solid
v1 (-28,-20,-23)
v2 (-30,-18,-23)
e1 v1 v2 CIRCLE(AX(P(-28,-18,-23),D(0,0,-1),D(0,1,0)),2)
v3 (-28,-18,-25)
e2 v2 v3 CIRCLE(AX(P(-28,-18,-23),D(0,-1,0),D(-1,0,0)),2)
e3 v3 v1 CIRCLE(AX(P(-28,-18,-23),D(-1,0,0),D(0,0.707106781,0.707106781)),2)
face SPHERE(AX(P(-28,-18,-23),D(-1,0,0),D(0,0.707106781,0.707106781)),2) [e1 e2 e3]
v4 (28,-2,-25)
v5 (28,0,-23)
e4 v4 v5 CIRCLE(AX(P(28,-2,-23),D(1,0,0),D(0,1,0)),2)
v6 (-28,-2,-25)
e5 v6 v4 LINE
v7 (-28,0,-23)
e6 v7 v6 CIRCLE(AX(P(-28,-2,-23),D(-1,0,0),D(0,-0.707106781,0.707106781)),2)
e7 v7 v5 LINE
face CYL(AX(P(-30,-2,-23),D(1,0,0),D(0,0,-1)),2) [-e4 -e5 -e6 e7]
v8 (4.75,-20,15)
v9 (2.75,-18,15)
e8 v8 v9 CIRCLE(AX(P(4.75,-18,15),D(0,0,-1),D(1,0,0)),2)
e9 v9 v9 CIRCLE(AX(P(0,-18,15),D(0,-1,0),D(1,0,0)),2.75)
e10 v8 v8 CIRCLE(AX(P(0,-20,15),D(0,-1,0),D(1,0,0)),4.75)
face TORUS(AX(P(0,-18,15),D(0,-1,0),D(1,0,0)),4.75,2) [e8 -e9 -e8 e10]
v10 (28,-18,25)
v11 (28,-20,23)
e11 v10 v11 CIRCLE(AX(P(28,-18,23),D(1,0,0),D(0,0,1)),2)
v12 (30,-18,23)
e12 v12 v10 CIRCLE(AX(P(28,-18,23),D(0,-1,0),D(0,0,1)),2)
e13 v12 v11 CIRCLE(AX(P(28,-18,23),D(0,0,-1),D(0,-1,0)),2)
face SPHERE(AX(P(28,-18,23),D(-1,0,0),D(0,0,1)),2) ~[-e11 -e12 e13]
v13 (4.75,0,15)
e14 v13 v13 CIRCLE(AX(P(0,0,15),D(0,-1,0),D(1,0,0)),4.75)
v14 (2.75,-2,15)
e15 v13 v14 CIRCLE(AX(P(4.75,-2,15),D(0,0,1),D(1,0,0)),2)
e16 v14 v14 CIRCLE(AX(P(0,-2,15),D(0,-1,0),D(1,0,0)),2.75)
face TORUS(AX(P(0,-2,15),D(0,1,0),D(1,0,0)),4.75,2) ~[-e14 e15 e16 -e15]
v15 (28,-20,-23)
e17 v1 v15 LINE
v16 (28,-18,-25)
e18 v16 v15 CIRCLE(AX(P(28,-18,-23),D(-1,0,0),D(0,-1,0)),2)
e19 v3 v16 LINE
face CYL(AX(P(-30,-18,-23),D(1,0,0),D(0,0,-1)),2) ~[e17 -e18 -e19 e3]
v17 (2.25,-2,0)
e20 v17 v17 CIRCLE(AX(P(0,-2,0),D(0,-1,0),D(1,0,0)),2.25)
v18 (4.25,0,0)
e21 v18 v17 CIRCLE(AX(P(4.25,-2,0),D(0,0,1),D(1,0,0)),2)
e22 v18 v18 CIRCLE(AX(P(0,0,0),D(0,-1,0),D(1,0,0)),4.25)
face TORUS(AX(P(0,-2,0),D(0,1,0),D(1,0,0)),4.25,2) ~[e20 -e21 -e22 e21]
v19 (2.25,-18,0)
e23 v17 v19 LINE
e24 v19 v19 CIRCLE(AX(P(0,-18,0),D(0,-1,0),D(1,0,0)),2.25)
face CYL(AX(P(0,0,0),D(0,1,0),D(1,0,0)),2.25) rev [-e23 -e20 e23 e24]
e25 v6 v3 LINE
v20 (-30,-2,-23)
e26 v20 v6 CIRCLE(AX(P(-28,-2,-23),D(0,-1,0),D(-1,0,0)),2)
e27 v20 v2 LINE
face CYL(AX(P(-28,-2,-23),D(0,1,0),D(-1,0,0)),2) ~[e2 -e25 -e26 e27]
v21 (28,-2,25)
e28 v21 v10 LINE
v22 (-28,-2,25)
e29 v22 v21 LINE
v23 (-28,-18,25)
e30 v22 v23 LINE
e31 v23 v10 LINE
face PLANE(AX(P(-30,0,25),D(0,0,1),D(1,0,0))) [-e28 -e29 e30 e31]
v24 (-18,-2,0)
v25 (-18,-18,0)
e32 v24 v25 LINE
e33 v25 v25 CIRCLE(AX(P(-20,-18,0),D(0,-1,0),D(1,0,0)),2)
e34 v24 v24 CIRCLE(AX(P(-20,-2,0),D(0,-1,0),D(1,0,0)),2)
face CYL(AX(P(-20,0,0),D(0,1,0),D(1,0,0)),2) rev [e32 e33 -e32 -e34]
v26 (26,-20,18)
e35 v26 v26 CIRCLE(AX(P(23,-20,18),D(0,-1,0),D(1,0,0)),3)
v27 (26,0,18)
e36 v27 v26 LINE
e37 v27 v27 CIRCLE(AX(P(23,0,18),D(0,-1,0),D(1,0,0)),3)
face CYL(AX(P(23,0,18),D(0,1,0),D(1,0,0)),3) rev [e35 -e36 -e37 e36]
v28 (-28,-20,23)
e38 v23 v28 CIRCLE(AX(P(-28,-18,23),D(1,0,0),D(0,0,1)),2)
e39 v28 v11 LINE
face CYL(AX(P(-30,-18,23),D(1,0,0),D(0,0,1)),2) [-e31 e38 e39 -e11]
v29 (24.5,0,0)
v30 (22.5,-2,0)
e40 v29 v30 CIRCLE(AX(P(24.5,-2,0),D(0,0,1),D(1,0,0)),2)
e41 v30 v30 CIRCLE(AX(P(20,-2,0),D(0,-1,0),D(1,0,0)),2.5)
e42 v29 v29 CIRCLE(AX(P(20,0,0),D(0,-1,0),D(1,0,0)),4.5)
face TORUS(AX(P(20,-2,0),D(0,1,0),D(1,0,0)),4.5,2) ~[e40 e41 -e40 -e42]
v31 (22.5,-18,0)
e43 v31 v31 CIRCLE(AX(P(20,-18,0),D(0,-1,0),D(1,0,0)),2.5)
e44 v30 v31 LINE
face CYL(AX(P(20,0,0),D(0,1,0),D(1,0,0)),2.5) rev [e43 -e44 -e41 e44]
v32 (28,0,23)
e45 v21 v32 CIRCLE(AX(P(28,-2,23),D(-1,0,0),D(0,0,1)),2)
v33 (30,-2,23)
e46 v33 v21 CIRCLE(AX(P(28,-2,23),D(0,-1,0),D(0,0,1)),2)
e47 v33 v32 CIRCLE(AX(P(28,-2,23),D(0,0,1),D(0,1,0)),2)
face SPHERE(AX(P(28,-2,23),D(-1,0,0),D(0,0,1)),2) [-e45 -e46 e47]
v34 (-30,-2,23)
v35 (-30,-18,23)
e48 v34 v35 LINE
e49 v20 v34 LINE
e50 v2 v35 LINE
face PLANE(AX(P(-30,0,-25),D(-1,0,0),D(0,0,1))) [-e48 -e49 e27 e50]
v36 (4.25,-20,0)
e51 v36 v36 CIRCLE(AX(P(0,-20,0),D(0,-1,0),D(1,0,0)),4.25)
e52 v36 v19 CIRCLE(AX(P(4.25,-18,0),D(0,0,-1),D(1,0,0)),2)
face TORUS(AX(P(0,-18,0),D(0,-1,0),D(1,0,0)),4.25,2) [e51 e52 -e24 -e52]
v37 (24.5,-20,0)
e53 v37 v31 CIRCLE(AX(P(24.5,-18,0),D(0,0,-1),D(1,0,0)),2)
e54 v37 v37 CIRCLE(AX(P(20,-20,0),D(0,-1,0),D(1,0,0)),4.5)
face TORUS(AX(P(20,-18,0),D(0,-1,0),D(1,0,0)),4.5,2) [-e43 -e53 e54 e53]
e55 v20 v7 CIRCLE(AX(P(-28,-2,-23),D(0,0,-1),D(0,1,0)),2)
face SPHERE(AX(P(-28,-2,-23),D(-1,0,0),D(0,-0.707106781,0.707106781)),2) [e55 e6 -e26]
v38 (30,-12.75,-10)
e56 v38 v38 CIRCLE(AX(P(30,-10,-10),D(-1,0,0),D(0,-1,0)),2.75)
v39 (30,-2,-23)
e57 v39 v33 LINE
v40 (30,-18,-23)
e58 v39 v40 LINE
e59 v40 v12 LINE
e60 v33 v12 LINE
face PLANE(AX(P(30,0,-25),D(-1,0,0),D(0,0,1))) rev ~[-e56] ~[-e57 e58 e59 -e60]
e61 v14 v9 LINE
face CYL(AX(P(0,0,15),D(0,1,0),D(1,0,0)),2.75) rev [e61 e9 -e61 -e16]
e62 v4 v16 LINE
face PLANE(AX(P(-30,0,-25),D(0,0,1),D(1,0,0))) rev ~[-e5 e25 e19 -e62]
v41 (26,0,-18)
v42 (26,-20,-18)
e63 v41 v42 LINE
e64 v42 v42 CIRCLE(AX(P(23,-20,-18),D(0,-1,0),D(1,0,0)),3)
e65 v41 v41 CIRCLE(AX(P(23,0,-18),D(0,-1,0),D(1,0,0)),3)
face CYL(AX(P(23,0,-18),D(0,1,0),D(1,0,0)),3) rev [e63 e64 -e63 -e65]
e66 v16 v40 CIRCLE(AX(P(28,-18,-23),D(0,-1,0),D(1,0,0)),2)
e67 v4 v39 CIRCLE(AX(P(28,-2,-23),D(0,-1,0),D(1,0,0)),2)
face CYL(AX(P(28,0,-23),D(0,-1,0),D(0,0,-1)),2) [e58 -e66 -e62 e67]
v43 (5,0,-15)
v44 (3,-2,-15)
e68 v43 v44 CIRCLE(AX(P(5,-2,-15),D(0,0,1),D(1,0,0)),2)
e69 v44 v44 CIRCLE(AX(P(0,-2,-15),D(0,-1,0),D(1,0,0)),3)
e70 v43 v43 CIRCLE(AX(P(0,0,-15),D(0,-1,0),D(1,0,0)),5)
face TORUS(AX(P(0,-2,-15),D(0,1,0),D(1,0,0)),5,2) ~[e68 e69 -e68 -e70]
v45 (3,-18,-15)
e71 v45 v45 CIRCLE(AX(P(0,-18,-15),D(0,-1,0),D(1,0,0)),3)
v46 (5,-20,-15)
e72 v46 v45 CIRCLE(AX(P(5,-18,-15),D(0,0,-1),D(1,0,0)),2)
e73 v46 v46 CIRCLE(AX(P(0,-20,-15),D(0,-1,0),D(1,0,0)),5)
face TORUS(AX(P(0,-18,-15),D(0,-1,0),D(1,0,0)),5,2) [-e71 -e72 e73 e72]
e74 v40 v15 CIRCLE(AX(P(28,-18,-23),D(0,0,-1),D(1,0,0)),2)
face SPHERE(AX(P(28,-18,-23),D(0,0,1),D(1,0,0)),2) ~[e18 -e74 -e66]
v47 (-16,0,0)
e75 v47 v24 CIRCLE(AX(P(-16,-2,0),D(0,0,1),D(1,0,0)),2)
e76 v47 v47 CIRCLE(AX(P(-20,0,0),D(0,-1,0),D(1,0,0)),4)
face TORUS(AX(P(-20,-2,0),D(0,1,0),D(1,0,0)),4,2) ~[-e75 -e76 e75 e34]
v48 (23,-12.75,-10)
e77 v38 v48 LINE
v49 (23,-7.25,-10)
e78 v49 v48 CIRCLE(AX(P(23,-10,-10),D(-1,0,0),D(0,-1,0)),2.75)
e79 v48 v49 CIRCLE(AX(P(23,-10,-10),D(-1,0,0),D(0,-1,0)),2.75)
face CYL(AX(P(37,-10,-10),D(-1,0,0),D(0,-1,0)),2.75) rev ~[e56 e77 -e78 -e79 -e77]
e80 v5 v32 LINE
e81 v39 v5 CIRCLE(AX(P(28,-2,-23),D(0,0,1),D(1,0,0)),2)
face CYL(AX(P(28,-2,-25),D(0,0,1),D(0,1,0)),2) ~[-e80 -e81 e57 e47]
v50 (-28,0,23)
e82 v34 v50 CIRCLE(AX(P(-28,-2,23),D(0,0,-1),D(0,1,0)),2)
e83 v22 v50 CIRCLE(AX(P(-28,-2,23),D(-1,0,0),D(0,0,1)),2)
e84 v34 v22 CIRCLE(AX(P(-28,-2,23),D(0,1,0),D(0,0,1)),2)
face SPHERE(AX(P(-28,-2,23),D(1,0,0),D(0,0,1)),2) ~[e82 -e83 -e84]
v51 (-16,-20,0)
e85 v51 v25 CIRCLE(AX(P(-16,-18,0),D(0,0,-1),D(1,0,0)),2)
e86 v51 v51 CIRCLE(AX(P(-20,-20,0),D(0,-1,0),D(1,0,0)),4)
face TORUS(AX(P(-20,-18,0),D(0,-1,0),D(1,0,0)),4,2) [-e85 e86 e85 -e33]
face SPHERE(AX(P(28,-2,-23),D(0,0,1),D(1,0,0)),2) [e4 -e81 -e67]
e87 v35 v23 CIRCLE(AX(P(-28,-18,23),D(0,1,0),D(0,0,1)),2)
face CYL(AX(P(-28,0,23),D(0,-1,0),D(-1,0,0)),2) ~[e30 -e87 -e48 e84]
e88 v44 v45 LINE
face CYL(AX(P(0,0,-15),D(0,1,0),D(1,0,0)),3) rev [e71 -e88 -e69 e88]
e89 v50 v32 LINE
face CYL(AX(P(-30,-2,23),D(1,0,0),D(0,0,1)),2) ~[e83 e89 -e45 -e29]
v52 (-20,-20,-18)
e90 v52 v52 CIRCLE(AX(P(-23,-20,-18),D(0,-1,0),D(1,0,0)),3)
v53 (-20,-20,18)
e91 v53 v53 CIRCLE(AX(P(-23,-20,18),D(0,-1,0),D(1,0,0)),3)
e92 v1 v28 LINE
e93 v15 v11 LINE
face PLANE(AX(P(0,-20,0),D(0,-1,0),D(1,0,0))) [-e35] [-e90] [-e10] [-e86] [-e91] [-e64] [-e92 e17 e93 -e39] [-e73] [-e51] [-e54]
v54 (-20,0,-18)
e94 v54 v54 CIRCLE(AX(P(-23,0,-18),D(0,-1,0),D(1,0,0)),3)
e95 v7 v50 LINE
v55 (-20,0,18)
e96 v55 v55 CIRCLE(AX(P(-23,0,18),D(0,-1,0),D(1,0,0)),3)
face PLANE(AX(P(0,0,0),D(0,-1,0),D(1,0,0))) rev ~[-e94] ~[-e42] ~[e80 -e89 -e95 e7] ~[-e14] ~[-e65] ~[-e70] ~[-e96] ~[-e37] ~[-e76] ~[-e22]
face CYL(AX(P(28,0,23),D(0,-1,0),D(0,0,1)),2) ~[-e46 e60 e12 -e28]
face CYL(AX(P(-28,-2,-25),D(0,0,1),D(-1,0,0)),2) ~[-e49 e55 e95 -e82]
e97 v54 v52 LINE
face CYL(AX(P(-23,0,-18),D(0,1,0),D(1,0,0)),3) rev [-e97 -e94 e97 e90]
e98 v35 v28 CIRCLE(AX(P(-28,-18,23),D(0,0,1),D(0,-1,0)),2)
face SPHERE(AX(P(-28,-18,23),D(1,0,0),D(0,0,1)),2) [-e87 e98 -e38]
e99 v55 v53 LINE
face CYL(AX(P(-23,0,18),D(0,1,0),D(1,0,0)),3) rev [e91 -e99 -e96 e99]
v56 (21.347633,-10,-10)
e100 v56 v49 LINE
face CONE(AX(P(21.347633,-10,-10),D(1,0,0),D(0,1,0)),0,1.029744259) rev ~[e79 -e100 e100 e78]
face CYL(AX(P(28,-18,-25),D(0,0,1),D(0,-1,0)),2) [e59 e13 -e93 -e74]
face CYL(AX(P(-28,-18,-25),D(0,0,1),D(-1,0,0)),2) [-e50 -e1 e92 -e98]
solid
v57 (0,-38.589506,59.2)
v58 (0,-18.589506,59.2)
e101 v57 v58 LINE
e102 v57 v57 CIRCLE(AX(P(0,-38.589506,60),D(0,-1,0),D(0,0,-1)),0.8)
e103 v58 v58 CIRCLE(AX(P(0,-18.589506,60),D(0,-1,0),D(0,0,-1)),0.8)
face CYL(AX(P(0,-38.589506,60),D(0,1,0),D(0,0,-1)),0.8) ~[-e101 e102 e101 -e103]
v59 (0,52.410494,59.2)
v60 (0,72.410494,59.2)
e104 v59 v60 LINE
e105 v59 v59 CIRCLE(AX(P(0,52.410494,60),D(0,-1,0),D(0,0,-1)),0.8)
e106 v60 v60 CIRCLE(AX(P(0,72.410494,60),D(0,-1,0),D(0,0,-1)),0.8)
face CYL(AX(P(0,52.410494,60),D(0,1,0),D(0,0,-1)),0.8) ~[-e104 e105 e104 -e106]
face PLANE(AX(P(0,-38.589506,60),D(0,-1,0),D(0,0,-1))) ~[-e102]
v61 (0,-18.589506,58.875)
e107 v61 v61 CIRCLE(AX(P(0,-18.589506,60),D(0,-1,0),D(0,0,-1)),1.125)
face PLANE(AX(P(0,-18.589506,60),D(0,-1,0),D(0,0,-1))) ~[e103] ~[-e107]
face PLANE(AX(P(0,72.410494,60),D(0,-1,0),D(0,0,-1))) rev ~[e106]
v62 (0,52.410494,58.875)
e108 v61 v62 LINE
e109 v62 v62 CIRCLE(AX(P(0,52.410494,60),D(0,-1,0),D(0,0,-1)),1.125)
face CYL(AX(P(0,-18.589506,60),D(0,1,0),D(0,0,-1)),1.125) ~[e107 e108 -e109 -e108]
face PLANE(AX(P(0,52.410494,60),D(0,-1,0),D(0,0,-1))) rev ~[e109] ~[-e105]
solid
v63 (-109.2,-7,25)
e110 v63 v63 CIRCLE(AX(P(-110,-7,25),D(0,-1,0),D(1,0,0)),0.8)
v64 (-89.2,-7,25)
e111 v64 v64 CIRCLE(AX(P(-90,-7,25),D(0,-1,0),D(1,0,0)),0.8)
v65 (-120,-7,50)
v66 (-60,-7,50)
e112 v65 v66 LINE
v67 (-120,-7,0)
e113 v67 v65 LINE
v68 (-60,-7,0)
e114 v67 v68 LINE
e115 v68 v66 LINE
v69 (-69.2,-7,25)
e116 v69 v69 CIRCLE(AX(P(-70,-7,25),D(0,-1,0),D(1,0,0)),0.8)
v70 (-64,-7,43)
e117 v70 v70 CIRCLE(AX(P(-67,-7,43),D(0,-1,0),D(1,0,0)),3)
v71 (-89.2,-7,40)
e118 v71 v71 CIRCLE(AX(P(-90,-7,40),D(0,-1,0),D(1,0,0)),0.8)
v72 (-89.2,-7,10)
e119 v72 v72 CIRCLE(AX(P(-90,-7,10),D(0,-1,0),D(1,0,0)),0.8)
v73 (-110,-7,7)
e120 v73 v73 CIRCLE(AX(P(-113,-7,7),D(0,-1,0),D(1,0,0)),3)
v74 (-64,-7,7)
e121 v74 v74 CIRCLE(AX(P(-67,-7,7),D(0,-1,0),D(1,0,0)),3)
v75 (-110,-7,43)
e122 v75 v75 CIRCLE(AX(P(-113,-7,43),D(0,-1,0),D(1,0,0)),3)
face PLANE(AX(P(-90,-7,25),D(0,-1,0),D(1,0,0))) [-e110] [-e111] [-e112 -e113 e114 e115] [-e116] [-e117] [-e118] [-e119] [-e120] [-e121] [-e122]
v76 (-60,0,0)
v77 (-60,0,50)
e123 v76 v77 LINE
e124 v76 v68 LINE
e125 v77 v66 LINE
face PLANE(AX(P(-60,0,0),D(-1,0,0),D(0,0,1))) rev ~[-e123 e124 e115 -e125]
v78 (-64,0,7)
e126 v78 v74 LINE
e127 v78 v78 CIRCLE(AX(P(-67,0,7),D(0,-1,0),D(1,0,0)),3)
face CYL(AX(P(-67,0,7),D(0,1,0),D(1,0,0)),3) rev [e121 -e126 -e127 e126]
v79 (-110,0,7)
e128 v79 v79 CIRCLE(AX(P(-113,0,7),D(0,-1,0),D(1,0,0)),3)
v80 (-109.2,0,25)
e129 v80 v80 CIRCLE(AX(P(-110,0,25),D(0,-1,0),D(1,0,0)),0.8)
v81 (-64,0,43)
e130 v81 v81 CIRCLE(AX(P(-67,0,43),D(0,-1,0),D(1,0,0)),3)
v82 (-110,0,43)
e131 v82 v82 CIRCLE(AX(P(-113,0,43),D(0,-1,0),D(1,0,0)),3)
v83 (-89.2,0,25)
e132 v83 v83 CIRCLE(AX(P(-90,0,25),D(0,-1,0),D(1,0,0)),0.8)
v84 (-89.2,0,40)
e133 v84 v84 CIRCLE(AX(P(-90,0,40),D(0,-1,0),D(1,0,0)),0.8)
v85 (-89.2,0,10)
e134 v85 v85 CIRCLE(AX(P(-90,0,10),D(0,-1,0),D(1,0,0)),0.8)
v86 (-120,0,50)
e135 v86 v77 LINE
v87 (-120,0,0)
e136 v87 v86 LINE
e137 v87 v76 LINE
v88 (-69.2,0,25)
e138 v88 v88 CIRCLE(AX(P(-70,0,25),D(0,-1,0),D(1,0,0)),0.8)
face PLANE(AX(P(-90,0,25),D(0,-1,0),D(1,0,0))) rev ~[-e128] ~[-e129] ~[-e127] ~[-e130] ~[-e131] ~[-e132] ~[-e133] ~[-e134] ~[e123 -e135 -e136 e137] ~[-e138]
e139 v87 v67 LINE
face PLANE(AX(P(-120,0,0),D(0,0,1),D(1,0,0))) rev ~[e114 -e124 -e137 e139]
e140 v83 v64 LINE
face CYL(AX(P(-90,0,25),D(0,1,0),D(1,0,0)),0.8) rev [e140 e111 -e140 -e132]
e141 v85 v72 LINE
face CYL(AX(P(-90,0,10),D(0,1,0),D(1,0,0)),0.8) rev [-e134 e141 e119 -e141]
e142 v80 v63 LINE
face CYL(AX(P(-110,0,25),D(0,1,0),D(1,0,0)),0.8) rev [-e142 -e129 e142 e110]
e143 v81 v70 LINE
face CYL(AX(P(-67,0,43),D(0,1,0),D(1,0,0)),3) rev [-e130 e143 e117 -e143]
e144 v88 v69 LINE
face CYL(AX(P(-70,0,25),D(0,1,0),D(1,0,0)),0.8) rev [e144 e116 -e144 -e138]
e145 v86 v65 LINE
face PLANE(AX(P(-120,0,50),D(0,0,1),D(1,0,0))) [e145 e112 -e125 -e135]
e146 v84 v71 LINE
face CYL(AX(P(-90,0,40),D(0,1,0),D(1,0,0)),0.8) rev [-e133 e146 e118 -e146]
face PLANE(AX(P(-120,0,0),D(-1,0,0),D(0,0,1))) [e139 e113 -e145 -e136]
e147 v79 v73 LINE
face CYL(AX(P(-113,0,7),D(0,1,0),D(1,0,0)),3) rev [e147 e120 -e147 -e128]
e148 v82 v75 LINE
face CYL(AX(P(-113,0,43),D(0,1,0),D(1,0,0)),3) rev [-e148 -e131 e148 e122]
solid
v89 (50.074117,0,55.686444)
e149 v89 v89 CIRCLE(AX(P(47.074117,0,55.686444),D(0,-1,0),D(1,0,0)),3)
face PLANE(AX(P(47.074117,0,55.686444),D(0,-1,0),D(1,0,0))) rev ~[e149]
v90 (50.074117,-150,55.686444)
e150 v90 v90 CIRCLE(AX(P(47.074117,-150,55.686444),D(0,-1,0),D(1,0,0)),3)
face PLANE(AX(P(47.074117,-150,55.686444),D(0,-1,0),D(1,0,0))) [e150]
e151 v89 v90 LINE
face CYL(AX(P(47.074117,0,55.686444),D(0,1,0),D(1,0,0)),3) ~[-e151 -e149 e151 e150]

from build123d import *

# Parameters (mm, degrees)
F0_W         = 60
F0_H         = 50
F0_R         = 3
F0_R_2       = 2
F0_R_3       = 2.25
F0_R_4       = 2.5
F0_R_5       = 2.75
F1_DEPTH     = 20
F3_D         = 5.5
F3_DEPTH     = 7
F3_TIP       = 1.6523667023
F4_R         = 2
F5_R         = 2
F6_R         = 2
F7_T1_DEPTH  = 16
F7_S5_W      = 2
F7_S5_H      = 2
F7_T6_DEPTH  = 2
F7_S11_W     = 2
F7_S11_H     = 2
F7_T12_DEPTH = 2
F10_W        = 60
F10_H        = 50
F10_R        = 3
F10_R_2      = 0.8
F11_DEPTH    = 7
F12_R        = 3
F13_DEPTH    = 150


# Not quite as in the source:
# - a fillet or chamfer that OpenCascade refuses, or shapes differently, is made with other operations: its cross-section is extruded or revolved along the edge and cut away or added


with BuildPart() as f1:
    # F0 (on Front) → F1 (new body)
    with BuildSketch(Plane.XZ):
        Rectangle(F0_W, F0_H)
        with Locations((-23, -18)):
            Circle(F0_R, mode=Mode.SUBTRACT)
        with Locations((0, -15)):
            Circle(F0_R, mode=Mode.SUBTRACT)
        with Locations((23, -18)):
            Circle(F0_R, mode=Mode.SUBTRACT)
        with Locations((-20, 0)):
            Circle(F0_R_2, mode=Mode.SUBTRACT)
        with Locations((-23, 18)):
            Circle(F0_R, mode=Mode.SUBTRACT)
        Circle(F0_R_3, mode=Mode.SUBTRACT)
        with Locations((20, 0)):
            Circle(F0_R_4, mode=Mode.SUBTRACT)
        with Locations((0, 15)):
            Circle(F0_R_5, mode=Mode.SUBTRACT)
        with Locations((23, 18)):
            Circle(F0_R, mode=Mode.SUBTRACT)
    extrude(amount=F1_DEPTH)

    # F3
    with Locations(Plane.YZ.offset(30)):
        with Locations((-10, -10)):
            Hole(F3_D / 2, depth=F3_DEPTH)
            with Locations((0, 0, -(F3_DEPTH + F3_TIP / 2))):  # 118° drill point
                Cone(0, F3_D / 2, F3_TIP, mode=Mode.SUBTRACT)

    # F4
    f4_edges = [f1.edges().sort_by_distance(p)[0] for p in [
        (0, -20, 25),
        (0, 0, 25),
        (-30, -10, 25),
        (-30, -20, 0),
        (-30, 0, 0),
        (30, -10, 25),
        (30, 0, 0),
        (30, -20, 0),
        (30, -10, -25),
        (0, -20, -25),
        (0, 0, -25),
    ]]
    fillet(f4_edges, radius=F4_R)

    # F5
    f5_edges = [f1.edges().sort_by_distance(p)[0] for p in [
        (-3, -20, -15),
        (-22, -20, 0),
        (-2.75, -20, 15),
        (-2.25, -20, 0),
        (17.5, -20, 0),
        (-3, 0, -15),
        (17.5, 0, 0),
        (-22, 0, 0),
        (-2.75, 0, 15),
    ]]
    fillet(f5_edges, radius=F5_R)

    # F6
    f6_edges = [f1.edges().sort_by_distance(p)[0] for p in [
        (-2.25, 0, 0),
    ]]
    fillet(f6_edges, radius=F6_R)

    # F7: fillet of radius 2 on 1 edges, made by hand

    # F7_s2 → F7_t1 (cut)
    with BuildSketch(Plane.XZ.offset(2)):
        with BuildLine():
            ThreePointArc((-30, -23), (-29.4142135624, -24.4142135624), (-28, -25))
            Line((-28, -25), (-30, -25))
            Line((-30, -25), (-30, -23))
        make_face()
    extrude(amount=F7_T1_DEPTH, mode=Mode.SUBTRACT)


with BuildPart() as f7_tool4:
    # F7_s5 → F7_t6 (new body)
    with BuildSketch(Plane.YZ.offset(-28)):
        with Locations((-1, -24)):
            Rectangle(F7_S5_W, F7_S5_H)
    extrude(amount=-F7_T6_DEPTH)

    # F7_s7 → F7_t8 (revolve, cut)
    with BuildSketch(Plane(origin=(-28, -2, -23), x_dir=(0, -0.7071067812, 0.7071067812), z_dir=(0, -0.7071067812, -0.7071067812))):
        with BuildLine():
            ThreePointArc((0, -2), (2, 0), (0, 2))
            Line((0, 2), (0, -2))
        make_face()
    revolve(axis=Axis((-28, -2, -23), (-1, 0, 0)), mode=Mode.SUBTRACT)


with BuildPart() as f1_1:
    add(f1.part)

    # F7_t3: cut F7_tool4
    add(f7_tool4.part, mode=Mode.SUBTRACT)


with BuildPart() as f7_tool10:
    # F7_s11 → F7_t12 (new body)
    with BuildSketch(Plane.YZ.offset(-28)):
        with Locations((-19, -24)):
            Rectangle(F7_S11_W, F7_S11_H)
    extrude(amount=-F7_T12_DEPTH)

    # F7_s13 → F7_t14 (revolve, cut)
    with BuildSketch(Plane(origin=(-28, -18, -23), x_dir=(0, 0.7071067812, 0.7071067812), z_dir=(0, -0.7071067812, 0.7071067812))):
        with BuildLine():
            ThreePointArc((0, -2), (2, 0), (0, 2))
            Line((0, 2), (0, -2))
        make_face()
    revolve(axis=Axis((-28, -18, -23), (-1, 0, 0)), mode=Mode.SUBTRACT)


with BuildPart() as f1_2:
    add(f1_1.part)

    # F7_t9: cut F7_tool10
    add(f7_tool10.part, mode=Mode.SUBTRACT)


with BuildPart() as f9:
    # F8 (on Right) → F9 (revolve)
    with BuildSketch(Plane.YZ):
        Polygon((72.4104943052, 59.2), (72.4104943052, 60), (-38.5895056948, 60), (-38.5895056948, 59.2), (-18.5895056948, 59.2), (-18.5895056948, 58.875), (52.4104943052, 58.875), (52.4104943052, 59.2), align=None)
    revolve(axis=Axis((0, 16.9104943052, 60), (0, -1, 0)))


with BuildPart() as f11:
    # F10 (on Front) → F11 (new body)
    with BuildSketch(Plane.XZ):
        with Locations((-90, 25)):
            Rectangle(F10_W, F10_H)
        with Locations((-113, 7)):
            Circle(F10_R, mode=Mode.SUBTRACT)
        with Locations((-90, 10)):
            Circle(F10_R_2, mode=Mode.SUBTRACT)
        with Locations((-67, 7)):
            Circle(F10_R, mode=Mode.SUBTRACT)
        with Locations((-110, 25)):
            Circle(F10_R_2, mode=Mode.SUBTRACT)
        with Locations((-113, 43)):
            Circle(F10_R, mode=Mode.SUBTRACT)
        with Locations((-90, 25)):
            Circle(F10_R_2, mode=Mode.SUBTRACT)
        with Locations((-70, 25)):
            Circle(F10_R_2, mode=Mode.SUBTRACT)
        with Locations((-90, 40)):
            Circle(F10_R_2, mode=Mode.SUBTRACT)
        with Locations((-67, 43)):
            Circle(F10_R, mode=Mode.SUBTRACT)
    extrude(amount=F11_DEPTH)


with BuildPart() as f13:
    # F12 (on Front) → F13 (new body)
    with BuildSketch(Plane.XZ):
        with Locations((47.0741167665, 55.6864440441)):
            Circle(F12_R)
    extrude(amount=F13_DEPTH)


solid = Compound([f1_2.part, f9.part, f11.part, f13.part])
